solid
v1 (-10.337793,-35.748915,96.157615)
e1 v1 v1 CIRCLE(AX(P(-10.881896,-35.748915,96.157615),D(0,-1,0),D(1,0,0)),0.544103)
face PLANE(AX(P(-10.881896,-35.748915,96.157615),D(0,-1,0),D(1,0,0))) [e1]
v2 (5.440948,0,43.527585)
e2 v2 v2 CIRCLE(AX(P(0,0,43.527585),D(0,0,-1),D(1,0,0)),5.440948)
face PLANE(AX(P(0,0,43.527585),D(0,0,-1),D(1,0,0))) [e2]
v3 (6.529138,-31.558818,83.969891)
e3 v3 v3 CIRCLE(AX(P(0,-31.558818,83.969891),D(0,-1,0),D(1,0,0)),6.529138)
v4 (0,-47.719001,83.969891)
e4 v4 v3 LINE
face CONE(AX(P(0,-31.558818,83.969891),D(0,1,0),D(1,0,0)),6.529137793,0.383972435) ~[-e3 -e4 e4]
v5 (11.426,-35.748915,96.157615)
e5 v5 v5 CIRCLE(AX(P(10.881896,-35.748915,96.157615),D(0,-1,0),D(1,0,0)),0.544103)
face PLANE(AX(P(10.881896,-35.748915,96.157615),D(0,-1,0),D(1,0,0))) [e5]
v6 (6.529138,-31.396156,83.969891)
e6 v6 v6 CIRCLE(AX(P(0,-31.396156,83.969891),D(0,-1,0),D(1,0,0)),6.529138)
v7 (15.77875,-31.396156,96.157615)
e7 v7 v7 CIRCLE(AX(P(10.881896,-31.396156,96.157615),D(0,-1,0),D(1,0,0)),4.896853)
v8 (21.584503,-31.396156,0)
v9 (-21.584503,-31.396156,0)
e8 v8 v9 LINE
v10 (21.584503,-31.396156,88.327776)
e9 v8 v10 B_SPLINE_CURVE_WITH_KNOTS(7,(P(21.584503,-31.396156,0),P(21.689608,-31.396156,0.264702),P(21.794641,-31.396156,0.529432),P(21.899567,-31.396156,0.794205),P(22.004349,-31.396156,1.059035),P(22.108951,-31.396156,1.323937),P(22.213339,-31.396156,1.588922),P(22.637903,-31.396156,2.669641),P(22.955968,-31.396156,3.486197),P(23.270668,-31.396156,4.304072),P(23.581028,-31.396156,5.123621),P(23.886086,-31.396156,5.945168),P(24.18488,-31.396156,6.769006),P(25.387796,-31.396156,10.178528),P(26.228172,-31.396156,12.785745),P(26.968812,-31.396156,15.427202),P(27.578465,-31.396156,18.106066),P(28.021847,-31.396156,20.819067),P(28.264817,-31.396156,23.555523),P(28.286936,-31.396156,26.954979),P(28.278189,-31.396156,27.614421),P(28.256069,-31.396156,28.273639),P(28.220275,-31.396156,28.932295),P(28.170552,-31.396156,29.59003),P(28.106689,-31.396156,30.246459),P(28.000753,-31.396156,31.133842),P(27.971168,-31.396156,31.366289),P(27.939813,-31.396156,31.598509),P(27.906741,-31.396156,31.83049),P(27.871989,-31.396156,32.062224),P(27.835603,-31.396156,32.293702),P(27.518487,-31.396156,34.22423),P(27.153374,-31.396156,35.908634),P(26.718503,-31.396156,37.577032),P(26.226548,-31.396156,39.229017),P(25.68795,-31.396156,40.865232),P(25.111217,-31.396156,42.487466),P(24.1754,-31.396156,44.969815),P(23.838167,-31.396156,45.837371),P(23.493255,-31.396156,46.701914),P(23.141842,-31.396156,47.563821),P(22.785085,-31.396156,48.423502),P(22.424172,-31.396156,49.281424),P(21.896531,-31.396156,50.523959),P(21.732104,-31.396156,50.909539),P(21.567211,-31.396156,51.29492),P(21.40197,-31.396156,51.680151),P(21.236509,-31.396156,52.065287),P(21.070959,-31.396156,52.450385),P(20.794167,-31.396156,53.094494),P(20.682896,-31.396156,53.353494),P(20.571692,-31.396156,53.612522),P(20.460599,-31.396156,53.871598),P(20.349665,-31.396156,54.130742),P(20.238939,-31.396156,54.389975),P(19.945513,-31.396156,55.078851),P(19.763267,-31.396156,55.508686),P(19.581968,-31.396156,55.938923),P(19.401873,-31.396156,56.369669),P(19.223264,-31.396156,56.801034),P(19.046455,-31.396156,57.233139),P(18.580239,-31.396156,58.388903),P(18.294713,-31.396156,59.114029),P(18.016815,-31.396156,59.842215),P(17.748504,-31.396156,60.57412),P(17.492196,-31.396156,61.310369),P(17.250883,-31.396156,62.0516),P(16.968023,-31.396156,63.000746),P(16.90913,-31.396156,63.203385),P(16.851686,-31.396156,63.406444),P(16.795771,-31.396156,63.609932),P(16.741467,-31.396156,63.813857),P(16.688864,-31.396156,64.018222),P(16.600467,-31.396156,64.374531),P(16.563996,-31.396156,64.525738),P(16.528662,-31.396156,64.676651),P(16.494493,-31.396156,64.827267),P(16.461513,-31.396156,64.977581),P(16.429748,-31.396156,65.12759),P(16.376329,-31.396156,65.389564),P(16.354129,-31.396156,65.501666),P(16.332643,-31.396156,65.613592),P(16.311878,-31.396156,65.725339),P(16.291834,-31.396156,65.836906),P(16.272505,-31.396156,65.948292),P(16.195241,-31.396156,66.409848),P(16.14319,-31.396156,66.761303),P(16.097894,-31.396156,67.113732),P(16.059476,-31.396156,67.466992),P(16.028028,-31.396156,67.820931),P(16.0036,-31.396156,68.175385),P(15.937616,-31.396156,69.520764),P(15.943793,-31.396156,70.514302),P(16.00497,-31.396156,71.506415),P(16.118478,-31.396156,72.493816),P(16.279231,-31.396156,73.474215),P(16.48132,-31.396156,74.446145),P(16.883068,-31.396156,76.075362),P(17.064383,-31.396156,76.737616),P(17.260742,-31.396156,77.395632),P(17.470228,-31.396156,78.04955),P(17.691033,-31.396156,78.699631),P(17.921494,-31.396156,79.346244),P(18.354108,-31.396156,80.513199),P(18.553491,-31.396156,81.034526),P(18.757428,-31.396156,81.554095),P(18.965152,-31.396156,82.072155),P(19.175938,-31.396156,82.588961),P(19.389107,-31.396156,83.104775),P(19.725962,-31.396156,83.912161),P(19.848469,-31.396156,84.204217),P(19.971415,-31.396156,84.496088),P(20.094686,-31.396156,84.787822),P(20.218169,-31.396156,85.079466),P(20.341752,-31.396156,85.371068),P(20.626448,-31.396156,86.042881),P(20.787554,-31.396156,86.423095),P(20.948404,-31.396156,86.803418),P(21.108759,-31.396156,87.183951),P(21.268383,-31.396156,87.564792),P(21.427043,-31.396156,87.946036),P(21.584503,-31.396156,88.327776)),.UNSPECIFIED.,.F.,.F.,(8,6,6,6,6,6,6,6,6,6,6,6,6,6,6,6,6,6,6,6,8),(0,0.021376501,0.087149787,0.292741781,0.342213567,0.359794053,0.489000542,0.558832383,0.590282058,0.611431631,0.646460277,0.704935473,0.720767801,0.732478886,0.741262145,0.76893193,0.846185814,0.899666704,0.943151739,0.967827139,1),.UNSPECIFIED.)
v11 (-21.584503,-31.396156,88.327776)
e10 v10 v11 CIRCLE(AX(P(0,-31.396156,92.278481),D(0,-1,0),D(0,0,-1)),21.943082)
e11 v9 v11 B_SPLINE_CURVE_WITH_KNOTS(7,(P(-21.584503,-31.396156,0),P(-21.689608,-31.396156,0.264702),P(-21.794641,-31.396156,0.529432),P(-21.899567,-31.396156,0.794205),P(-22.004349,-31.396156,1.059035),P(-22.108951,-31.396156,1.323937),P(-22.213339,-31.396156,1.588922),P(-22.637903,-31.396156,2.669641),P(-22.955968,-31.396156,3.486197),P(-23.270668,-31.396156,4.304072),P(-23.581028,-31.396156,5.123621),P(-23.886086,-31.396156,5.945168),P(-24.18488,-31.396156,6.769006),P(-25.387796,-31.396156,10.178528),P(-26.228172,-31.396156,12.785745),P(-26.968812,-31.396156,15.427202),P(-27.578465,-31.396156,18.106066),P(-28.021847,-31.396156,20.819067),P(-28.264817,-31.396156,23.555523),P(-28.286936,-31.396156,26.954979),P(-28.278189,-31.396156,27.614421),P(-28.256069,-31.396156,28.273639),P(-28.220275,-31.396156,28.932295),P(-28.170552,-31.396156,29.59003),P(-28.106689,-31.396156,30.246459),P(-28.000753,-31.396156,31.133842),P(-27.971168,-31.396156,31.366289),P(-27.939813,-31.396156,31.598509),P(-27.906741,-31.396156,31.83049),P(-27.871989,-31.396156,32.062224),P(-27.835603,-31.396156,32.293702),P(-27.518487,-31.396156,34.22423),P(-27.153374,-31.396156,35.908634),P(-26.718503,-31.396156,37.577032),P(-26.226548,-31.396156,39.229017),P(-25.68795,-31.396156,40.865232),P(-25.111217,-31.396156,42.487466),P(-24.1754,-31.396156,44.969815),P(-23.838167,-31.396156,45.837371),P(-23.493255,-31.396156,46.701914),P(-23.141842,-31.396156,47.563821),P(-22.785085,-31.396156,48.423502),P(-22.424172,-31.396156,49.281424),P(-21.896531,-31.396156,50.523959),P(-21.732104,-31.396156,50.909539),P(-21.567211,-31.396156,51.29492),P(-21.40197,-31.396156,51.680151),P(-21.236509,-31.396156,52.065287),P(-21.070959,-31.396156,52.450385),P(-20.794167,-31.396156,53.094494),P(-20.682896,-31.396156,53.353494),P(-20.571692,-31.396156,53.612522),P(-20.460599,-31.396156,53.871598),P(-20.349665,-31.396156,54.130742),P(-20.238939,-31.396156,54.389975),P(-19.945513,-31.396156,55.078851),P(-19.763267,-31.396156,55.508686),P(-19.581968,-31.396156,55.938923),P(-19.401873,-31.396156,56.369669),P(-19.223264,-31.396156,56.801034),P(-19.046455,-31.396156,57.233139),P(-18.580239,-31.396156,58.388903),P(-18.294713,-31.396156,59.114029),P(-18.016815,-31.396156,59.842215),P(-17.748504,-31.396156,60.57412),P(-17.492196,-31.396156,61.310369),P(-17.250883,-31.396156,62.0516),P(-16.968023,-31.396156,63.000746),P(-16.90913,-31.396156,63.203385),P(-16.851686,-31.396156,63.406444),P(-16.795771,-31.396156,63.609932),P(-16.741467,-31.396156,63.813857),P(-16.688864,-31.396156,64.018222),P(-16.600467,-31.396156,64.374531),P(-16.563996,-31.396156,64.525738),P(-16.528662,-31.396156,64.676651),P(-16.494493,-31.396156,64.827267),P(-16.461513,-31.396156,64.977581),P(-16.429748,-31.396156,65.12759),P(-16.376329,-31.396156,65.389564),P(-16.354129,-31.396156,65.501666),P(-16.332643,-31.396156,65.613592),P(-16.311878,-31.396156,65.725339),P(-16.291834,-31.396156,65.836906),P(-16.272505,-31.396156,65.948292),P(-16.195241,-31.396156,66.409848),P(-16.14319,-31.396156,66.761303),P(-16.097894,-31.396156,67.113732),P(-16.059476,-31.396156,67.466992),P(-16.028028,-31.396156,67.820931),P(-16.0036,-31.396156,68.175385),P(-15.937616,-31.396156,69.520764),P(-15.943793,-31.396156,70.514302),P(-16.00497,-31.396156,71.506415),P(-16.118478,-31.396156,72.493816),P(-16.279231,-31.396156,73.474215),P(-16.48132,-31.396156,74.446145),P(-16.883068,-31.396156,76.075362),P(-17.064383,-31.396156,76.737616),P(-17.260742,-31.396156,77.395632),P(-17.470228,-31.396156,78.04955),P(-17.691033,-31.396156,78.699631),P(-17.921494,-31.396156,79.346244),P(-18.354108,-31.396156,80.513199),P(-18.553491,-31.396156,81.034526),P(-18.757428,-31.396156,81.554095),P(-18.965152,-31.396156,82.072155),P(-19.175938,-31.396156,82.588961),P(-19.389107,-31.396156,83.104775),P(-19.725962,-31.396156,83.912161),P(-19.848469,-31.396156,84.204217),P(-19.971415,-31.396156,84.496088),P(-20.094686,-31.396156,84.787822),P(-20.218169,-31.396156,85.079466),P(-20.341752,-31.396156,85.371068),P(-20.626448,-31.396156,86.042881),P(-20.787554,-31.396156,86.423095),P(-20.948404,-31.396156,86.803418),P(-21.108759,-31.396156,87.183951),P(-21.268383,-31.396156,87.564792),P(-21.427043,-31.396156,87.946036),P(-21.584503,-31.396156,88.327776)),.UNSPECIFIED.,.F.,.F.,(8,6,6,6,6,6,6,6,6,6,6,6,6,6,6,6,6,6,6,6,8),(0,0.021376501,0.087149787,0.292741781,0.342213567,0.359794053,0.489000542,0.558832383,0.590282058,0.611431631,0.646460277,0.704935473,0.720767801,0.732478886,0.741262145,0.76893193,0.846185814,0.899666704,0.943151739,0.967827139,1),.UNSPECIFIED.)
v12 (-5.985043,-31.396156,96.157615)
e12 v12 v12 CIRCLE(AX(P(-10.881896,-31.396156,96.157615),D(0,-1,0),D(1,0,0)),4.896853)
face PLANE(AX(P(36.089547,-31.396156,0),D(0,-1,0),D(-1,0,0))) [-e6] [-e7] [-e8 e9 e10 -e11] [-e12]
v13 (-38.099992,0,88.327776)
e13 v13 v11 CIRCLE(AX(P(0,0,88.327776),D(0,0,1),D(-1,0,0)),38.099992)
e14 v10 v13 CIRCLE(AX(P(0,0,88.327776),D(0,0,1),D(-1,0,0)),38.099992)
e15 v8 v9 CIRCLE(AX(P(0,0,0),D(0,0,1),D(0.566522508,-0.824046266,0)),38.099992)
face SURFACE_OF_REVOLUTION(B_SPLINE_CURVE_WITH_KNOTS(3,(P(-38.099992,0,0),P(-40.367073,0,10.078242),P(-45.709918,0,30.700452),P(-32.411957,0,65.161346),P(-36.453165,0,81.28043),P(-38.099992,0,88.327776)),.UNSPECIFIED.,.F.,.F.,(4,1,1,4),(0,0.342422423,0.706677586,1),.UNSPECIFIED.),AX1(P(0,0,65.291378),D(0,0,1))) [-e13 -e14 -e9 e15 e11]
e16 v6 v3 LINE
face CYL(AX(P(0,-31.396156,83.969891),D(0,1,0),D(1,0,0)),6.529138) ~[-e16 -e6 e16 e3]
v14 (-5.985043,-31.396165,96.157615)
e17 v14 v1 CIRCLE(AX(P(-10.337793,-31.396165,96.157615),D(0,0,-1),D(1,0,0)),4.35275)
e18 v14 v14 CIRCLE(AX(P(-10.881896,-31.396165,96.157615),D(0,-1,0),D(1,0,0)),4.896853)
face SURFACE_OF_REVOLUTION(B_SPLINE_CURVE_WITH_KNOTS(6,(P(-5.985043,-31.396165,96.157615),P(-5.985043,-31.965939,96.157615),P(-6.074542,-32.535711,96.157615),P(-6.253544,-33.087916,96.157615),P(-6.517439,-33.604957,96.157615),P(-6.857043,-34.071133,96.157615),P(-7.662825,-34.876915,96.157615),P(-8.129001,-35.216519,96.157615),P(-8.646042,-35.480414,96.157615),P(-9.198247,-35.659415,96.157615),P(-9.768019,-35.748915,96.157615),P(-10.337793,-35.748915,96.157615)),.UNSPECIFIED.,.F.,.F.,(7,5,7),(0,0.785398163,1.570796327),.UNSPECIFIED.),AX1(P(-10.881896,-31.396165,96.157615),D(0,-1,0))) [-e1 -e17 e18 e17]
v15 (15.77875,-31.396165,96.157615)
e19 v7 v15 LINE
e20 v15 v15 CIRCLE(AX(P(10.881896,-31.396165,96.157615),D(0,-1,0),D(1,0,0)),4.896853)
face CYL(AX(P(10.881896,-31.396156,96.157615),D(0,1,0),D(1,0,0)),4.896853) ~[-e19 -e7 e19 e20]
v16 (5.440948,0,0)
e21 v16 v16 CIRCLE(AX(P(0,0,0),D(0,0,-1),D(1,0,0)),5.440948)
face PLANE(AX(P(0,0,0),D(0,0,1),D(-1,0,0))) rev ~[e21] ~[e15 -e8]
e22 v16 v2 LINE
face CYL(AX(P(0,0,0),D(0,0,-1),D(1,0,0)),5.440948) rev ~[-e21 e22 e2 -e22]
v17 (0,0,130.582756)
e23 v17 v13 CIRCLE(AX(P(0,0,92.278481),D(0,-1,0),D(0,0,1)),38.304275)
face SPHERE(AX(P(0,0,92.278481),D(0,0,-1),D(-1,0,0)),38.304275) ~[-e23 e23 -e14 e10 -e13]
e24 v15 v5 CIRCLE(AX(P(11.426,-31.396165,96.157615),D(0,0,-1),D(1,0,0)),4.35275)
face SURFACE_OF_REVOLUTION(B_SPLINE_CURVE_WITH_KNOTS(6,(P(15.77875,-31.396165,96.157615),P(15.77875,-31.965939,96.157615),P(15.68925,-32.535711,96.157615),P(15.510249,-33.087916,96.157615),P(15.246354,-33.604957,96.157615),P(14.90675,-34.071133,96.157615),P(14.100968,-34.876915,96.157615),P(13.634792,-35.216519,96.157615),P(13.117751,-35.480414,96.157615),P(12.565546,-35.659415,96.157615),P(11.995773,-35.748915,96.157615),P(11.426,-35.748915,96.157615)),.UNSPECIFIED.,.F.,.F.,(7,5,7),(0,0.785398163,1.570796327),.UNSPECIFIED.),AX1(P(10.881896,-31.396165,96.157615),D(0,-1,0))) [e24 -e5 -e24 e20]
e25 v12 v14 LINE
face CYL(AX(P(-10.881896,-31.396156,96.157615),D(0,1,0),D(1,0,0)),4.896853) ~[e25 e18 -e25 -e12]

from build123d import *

# Parameters (mm, degrees)
F3_DEPTH  = 177.8
F4_R      = 7.62
F5_DEPTH  = 19.05
F6_SIZE2  = 18.860161823
F6_SIZE   = 7.62
F4_R_2    = 5.715
F7_DEPTH  = 5.08
F8_R      = 5.07999
F9_R      = 6.35
F10_DEPTH = 50.8
F11_SCALE = 0.85684223


# Not quite as in the source:
# - a fillet or chamfer is up to 0.001 mm smaller than in the source, because OpenCascade refuses the exact size


with BuildPart() as f1:
    # F0 (on Front) → F1 (revolve)
    with BuildSketch(Plane.XZ):
        with BuildLine():
            Line((-38.2711647941, 0), (0, 0))
            Line((0, 0), (0, 146.0500033258))
            Line((0, 146.0500033258), (0, 152.4))
            ThreePointArc((0, 152.4), (-33.2006597867, 137.6319951518), (-44.4655865431, 103.0852268133))
            add(Edge.make_bspline(
                [(-44.4655865431, 0), (-47.1114422222, 11.762074058), (-53.3469479224, 35.8297600734), (-37.8272166921, 76.0482431769), (-42.543614325, 94.8604386904), (-44.4655865431, 103.0852268133)],
                knots=[0, 0, 0, 0, 0.3424224234, 0.7066775859, 1, 1, 1, 1], degree=3))
            Line((-44.4655865431, 0), (-38.2711647941, 0))
        make_face()
    revolve(axis=Axis((0, 0, 76.2), (0, 0, 1)))

    # F2 (on Top) → F3 (cut)
    with BuildSketch(Plane.XY):
        Polygon((25.6092443837, -36.641700535), (-25.1907556163, -36.641700535), (-46.7807556163, -36.641700535), (-46.7807556163, -67.121700535), (42.1192443837, -67.121700535), (42.1192443837, -36.641700535), align=None)
    extrude(amount=F3_DEPTH, mode=Mode.SUBTRACT)

    # F4 (on face) → F5 (join)
    with BuildSketch(Plane.XZ.offset(36.641700535)):
        with Locations((0, 97.9992443837)):
            Circle(F4_R)
    extrude(amount=F5_DEPTH)

    # F6
    f6_edges = [f1.edges().sort_by_distance(p)[0] for p in [
        (-7.62, -55.691701, 97.999244),
    ]]
    f6_side = f1.faces().sort_by_distance((0, -55.691701, 97.999244))[0]
    chamfer(f6_edges, length=F6_SIZE, length2=F6_SIZE2, reference=f6_side)

    # F4 (on face) → F7 (join)
    with BuildSketch(Plane.XZ.offset(36.641700535)):
        with Locations((-12.7, 112.2232443837)):
            Circle(F4_R_2)
        with Locations((12.7, 112.2232443837)):
            Circle(F4_R_2)
    extrude(amount=F7_DEPTH)

    # F8 (radius 5.08 in the source; OpenCascade refuses exactly that, so slightly less here)
    f8_edges = [f1.edges().sort_by_distance(p)[0] for p in [
        (-18.415, -41.721701, 112.223244),
        (6.985, -41.721701, 112.223244),
    ]]
    fillet(f8_edges, radius=F8_R)

    # F9 (on face) → F10 (cut)
    with BuildSketch(Plane(origin=(0, 0, 0), x_dir=(1, 0, 0), z_dir=(0, 0, -1))):
        Circle(F9_R)
    extrude(amount=-F10_DEPTH, mode=Mode.SUBTRACT)


with BuildPart() as f1_1:
    # F11: moved
    add(f1.part.scale(F11_SCALE))


solid = f1_1.part
